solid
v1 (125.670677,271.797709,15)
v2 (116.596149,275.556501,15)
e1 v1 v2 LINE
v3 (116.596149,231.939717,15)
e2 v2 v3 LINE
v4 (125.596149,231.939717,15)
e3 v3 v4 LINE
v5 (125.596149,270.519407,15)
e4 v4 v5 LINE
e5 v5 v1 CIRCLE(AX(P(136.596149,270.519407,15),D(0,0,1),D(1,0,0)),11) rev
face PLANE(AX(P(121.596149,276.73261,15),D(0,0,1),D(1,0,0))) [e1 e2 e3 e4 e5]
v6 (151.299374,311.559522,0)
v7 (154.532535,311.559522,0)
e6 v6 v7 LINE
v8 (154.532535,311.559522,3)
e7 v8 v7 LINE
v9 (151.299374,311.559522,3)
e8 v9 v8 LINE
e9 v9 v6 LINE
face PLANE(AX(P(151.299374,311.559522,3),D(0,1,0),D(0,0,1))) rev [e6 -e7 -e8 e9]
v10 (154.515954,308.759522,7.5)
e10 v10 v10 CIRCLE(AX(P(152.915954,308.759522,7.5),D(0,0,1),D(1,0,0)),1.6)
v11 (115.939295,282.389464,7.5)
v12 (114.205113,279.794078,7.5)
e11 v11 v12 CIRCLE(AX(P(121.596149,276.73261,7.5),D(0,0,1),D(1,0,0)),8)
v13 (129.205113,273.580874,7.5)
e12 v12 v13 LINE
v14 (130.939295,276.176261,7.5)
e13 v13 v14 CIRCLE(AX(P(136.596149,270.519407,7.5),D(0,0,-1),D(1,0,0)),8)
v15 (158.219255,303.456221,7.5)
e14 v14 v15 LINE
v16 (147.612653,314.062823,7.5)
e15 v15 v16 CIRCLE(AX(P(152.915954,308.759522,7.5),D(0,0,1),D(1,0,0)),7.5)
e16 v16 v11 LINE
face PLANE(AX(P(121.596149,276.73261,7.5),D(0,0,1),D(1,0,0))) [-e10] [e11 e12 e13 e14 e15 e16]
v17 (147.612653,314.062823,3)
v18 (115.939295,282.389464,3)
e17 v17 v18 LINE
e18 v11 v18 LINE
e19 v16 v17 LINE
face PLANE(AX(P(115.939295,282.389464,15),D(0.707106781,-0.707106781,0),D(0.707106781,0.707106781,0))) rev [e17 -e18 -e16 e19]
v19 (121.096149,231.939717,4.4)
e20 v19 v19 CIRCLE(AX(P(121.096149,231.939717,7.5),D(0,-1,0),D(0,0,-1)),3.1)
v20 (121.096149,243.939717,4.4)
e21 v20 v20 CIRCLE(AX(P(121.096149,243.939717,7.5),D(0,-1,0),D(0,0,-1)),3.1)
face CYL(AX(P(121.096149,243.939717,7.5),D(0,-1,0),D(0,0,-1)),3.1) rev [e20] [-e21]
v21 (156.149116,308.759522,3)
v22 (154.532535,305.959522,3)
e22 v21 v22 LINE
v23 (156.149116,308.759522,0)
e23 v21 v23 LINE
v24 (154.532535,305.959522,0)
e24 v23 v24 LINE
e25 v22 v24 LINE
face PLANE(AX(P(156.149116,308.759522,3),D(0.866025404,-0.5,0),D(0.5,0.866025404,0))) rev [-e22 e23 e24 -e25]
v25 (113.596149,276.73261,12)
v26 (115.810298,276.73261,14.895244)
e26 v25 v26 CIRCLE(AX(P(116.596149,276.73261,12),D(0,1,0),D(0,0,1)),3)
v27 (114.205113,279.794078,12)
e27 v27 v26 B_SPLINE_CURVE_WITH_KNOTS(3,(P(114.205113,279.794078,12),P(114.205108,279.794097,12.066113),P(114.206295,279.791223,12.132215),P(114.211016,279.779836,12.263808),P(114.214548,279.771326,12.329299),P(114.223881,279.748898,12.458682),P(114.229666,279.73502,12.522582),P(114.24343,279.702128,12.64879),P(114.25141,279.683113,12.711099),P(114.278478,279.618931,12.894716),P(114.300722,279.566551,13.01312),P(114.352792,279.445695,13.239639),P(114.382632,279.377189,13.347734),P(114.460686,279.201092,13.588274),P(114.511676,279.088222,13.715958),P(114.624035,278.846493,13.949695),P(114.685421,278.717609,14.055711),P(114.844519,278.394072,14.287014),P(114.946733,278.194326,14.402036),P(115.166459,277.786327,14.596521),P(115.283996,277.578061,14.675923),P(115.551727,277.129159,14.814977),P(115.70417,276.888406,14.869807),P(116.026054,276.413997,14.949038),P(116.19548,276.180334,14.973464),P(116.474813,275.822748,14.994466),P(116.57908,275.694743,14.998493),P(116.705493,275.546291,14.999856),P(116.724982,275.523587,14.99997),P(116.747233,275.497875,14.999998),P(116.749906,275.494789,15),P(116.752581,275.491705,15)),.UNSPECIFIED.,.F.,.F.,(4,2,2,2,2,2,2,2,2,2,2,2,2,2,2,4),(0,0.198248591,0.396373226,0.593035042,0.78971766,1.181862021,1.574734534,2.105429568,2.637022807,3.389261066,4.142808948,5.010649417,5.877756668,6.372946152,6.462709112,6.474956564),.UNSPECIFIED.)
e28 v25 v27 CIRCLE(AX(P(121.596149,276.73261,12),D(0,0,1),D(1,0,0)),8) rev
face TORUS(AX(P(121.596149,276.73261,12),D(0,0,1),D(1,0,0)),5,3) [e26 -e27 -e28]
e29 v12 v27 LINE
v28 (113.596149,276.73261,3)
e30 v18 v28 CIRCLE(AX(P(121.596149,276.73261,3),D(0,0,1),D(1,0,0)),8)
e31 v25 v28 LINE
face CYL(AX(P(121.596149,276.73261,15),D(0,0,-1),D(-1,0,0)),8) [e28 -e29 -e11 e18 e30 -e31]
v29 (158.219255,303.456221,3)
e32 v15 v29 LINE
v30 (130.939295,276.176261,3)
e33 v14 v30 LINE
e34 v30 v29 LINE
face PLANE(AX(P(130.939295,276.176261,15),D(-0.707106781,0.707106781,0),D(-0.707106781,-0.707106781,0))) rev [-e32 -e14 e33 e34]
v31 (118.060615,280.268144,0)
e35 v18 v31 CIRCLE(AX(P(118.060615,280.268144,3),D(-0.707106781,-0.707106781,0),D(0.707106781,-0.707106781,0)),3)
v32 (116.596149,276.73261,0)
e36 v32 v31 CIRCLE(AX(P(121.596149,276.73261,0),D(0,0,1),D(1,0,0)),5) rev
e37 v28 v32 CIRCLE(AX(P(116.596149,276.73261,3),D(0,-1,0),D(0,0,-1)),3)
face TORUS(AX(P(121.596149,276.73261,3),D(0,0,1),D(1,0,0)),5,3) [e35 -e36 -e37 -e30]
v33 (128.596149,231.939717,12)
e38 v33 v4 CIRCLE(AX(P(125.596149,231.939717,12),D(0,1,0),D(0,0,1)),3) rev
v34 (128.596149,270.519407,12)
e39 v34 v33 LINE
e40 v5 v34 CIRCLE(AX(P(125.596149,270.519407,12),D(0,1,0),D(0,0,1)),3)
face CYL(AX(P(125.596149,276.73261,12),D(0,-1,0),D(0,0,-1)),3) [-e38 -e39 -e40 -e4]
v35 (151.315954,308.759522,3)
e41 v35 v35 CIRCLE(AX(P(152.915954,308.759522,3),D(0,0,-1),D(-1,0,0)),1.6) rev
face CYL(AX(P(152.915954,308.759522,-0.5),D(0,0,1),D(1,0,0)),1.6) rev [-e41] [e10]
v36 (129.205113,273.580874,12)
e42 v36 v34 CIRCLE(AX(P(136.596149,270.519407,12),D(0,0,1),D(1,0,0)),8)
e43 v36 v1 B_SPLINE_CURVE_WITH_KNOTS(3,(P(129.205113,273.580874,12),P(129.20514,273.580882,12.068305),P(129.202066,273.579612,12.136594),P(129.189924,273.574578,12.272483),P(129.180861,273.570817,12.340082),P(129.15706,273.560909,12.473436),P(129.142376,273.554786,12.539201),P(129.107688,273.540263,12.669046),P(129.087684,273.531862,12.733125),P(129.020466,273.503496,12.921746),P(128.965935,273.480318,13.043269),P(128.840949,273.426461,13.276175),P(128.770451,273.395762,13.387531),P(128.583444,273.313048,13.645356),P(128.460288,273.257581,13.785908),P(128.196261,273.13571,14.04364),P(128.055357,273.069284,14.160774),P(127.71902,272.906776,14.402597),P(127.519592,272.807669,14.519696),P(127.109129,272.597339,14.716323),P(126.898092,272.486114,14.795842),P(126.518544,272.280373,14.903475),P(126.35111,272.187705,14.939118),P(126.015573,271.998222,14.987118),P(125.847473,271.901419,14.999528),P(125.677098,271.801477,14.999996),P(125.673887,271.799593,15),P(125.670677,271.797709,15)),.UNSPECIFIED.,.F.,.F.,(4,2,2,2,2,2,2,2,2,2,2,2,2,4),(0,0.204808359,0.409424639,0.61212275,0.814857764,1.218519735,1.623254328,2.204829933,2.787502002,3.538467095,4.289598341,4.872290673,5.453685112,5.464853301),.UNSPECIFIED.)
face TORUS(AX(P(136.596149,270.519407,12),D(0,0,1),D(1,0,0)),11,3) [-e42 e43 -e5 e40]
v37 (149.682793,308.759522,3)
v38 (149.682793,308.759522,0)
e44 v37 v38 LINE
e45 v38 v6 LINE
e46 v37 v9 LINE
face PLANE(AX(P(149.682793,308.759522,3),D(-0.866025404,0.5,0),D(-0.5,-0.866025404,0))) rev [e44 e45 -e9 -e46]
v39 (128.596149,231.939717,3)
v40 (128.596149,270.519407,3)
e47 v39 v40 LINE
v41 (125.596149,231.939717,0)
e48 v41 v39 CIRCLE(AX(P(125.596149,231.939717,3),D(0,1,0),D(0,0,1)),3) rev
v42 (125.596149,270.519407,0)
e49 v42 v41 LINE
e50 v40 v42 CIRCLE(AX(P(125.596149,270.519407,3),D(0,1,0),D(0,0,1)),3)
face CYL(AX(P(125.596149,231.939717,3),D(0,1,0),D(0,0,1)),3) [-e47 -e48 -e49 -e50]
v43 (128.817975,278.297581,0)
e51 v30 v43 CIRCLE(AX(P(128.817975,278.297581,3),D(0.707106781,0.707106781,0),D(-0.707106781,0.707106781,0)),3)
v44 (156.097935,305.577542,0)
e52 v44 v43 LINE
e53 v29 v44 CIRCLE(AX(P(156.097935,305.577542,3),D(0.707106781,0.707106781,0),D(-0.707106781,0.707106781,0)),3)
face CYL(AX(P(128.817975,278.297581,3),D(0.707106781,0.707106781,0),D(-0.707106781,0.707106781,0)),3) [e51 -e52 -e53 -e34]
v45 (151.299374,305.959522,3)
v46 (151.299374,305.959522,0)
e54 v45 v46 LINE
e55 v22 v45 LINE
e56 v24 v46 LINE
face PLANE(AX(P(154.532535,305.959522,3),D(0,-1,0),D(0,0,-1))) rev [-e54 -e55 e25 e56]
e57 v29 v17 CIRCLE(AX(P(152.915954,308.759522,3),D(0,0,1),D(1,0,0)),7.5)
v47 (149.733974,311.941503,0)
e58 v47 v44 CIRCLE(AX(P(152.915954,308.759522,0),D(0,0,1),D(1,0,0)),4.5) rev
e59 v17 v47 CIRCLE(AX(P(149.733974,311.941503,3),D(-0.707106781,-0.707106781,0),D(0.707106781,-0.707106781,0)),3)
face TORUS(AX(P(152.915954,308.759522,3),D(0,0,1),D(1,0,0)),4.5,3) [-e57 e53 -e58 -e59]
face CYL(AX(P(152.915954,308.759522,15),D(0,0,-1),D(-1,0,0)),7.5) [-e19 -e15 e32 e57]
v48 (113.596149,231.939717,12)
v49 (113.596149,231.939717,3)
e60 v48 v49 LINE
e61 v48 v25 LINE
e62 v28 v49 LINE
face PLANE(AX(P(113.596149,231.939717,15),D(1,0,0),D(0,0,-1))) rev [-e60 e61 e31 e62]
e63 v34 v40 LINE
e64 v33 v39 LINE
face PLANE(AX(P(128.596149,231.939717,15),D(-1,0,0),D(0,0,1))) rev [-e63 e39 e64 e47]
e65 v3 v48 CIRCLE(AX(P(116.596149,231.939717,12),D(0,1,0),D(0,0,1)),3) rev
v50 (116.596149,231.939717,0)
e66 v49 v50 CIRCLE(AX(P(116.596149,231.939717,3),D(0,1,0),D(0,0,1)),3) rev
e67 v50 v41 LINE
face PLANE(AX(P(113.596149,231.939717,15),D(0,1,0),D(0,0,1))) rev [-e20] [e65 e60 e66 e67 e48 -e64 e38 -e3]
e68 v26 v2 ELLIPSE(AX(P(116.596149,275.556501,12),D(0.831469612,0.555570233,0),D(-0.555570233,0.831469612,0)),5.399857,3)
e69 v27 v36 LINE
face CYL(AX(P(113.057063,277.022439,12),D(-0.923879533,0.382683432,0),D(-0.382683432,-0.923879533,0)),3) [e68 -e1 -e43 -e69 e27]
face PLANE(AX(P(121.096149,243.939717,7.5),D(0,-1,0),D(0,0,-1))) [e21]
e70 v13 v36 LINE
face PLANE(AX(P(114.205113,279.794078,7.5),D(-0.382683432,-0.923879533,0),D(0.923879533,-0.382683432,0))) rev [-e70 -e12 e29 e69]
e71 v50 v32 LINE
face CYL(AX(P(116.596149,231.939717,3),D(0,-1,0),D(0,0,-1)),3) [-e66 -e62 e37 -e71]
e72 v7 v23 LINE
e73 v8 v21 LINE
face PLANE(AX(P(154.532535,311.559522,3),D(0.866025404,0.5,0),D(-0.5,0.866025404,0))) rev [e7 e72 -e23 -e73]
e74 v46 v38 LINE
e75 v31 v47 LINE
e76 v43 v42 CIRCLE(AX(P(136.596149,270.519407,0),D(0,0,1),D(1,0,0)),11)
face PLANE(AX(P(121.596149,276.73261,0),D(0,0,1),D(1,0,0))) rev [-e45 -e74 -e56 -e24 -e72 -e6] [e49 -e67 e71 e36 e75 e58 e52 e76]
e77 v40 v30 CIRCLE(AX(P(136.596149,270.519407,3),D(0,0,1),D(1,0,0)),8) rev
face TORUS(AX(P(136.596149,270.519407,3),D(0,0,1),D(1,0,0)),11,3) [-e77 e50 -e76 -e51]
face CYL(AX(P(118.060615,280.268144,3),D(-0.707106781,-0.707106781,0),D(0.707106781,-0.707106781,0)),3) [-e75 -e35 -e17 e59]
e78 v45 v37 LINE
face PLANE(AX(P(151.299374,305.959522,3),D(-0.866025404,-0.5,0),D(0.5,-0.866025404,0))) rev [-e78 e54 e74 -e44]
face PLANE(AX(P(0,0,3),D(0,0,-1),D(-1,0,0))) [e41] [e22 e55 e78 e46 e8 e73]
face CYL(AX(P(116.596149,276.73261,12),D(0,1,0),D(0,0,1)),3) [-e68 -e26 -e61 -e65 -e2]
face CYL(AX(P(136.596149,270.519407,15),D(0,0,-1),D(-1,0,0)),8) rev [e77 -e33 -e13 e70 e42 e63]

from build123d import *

# Parameters (mm, degrees)
EXTRUDE_1_DEPTH     = 15
SKETCH_2_R          = 3.1
CUT_EXTRUDE_1_DEPTH = 12
CUT_EXTRUDE_START   = -7.5
CUT_EXTRUDE_2_DEPTH = 7.5
SKETCH_4_R          = 1.6
CUT_EXTRUDE_3_DEPTH = 8
CUT_EXTRUDE_4_DEPTH = 3
FILLET_1_R          = 3


with BuildPart() as part:
    # Model → 凸台-拉伸1 (new body)
    with BuildSketch(Plane.XY):
        with BuildLine():
            Line((113.596149123, 231.939716908), (128.596149123, 231.939716908))
            Line((128.596149123, 231.939716908), (128.596149123, 270.519406691))
            ThreePointArc((128.596149123, 270.519406691), (129.205112863, 273.58087415), (130.939294874, 276.17626094))
            Line((130.939294874, 276.17626094), (158.219255135, 303.456221202))
            ThreePointArc((158.219255135, 303.456221202), (158.219255135, 314.06282292), (147.612653418, 314.06282292))
            Line((147.612653418, 314.06282292), (115.939294874, 282.389464376))
            ThreePointArc((115.939294874, 282.389464376), (114.205112863, 279.794077585), (113.596149123, 276.732610126))
            Line((113.596149123, 276.732610126), (113.596149123, 231.939716908))
        make_face()
    extrude(amount=EXTRUDE_1_DEPTH)

    # 草图2 → 切除-拉伸1 (cut)
    with BuildSketch(Plane.XZ.offset(-231.939716908)):
        with Locations(Location((121.096149123, 7.5, 0), (0, 0, 270))):
            Circle(SKETCH_2_R)
    extrude(amount=-CUT_EXTRUDE_1_DEPTH, mode=Mode.SUBTRACT)

    # 草图3 → 切除-拉伸2 (cut)
    with BuildSketch(Plane.XY.offset(15).offset(CUT_EXTRUDE_START)):
        with BuildLine():
            Line((114.205112863, 279.794077585), (129.205112863, 273.58087415))
            ThreePointArc((129.205112863, 273.58087415), (129.944392225, 274.963968555), (130.939294874, 276.17626094))
            Line((130.939294874, 276.17626094), (158.219255135, 303.456221202))
            ThreePointArc((158.219255135, 303.456221202), (158.219255135, 314.06282292), (147.612653418, 314.06282292))
            Line((147.612653418, 314.06282292), (115.939294874, 282.389464376))
            ThreePointArc((115.939294874, 282.389464376), (114.944392225, 281.17717199), (114.205112863, 279.794077585))
        make_face()
    extrude(amount=CUT_EXTRUDE_2_DEPTH, mode=Mode.SUBTRACT)

    # 草图4 → 切除-拉伸3 (cut)
    with BuildSketch(Plane.XY.offset(7.5)):
        with Locations((152.915954276, 308.759522061)):
            Circle(SKETCH_4_R)
    extrude(amount=-CUT_EXTRUDE_3_DEPTH, mode=Mode.SUBTRACT)

    # 草图5 → 切除-拉伸4 (cut)
    with BuildSketch(Plane(origin=(0, 0, 0), x_dir=(-1, 0, 0), z_dir=(0, 0, -1))):
        Polygon((-149.682792769, 308.759522061), (-151.299373523, 311.559522061), (-154.53253503, 311.559522061), (-156.149115784, 308.759522061), (-154.53253503, 305.959522061), (-151.299373523, 305.959522061), align=None)
    extrude(amount=-CUT_EXTRUDE_4_DEPTH, mode=Mode.SUBTRACT)

    # 圆角1
    # the kernel refuses this fillet: 3 mm, written as the material it takes off along each edge
    with BuildSketch(Plane(origin=(113.596149123, 276.732610126, 0), x_dir=(0, 0, 1), z_dir=(0, -1, 0))) as fillet_1_piece_1:
        with BuildLine():
            CenterArc((FILLET_1_R, -FILLET_1_R), FILLET_1_R, 90, 90)
            Line((0, -FILLET_1_R), (0, 0))
            Line((0, 0), (FILLET_1_R, 0))
        make_face()
    extrude(amount=52.292893219, mode=Mode.SUBTRACT)
    with BuildSketch(Plane(origin=(121.596149123, 276.732610126, 0), x_dir=(-0.7071067811865422, 0.7071067811865529, 0), z_dir=(0.7071067811865529, 0.7071067811865422, 0))) as fillet_1_piece_2:
        with BuildLine():
            CenterArc((8 - FILLET_1_R, FILLET_1_R), FILLET_1_R, 270, 90)
            Line((8, FILLET_1_R), (8, 0))
            Line((8, 0), (8 - FILLET_1_R, 0))
        make_face()
    revolve(axis=Axis((121.596149123, 276.732610126, 0), (0, 0, 1)), revolution_arc=45, mode=Mode.SUBTRACT)
    with BuildSketch(Plane(origin=(147.612653418, 314.06282292, 0), x_dir=(0.7071067811865483, -0.7071067811865468, 0), z_dir=(-0.7071067811865469, -0.7071067811865482, 0))) as fillet_1_piece_3:
        with BuildLine():
            CenterArc((FILLET_1_R, FILLET_1_R), FILLET_1_R, 180, 90)
            Line((0, FILLET_1_R), (0, 0))
            Line((0, 0), (FILLET_1_R, 0))
        make_face()
    extrude(amount=44.792893219, mode=Mode.SUBTRACT)
    with BuildSketch(Plane(origin=(152.915954276, 308.759522061, 0), x_dir=(0.7071067811865419, -0.7071067811865532, 0), z_dir=(-0.7071067811865532, -0.7071067811865419, 0))) as fillet_1_piece_4:
        with BuildLine():
            CenterArc((7.5 - FILLET_1_R, FILLET_1_R), FILLET_1_R, 270, 90)
            Line((7.5, FILLET_1_R), (7.5, 0))
            Line((7.5, 0), (7.5 - FILLET_1_R, 0))
        make_face()
    revolve(axis=Axis((152.915954276, 308.759522061, 0), (0, 0, 1)), revolution_arc=180, mode=Mode.SUBTRACT)
    with BuildSketch(Plane(origin=(130.939294874, 276.17626094, 0), x_dir=(-0.707106781186548, 0.7071067811865471, 0), z_dir=(0.7071067811865471, 0.7071067811865479, 0))) as fillet_1_piece_5:
        with BuildLine():
            CenterArc((FILLET_1_R, FILLET_1_R), FILLET_1_R, 180, 90)
            Line((0, FILLET_1_R), (0, 0))
            Line((0, 0), (FILLET_1_R, 0))
        make_face()
    extrude(amount=38.579689783, mode=Mode.SUBTRACT)
    with BuildSketch(Plane(origin=(136.596149123, 270.519406691, 0), x_dir=(-1, 0, 0), z_dir=(0, -1, 0))) as fillet_1_piece_6:
        with BuildLine():
            CenterArc((8 + FILLET_1_R, -FILLET_1_R), FILLET_1_R, 90, 90)
            Line((8, -FILLET_1_R), (8, 0))
            Line((8, 0), (8 + FILLET_1_R, 0))
        make_face()
    revolve(axis=Axis((136.596149123, 270.519406691, 0), (0, 0, -1)), revolution_arc=45, mode=Mode.SUBTRACT)
    with BuildSketch(Plane(origin=(136.596149123, 270.519406691, 15), x_dir=(-1, 0, 0), z_dir=(0, -1, 0))) as fillet_1_piece_7:
        with BuildLine():
            CenterArc((8 + FILLET_1_R, FILLET_1_R), FILLET_1_R, 180, 90)
            Line((8, FILLET_1_R), (8, 0))
            Line((8, 0), (8 + FILLET_1_R, 0))
        make_face()
    revolve(axis=Axis((136.596149123, 270.519406691, 15), (0, 0, -1)), revolution_arc=76.216141543, mode=Mode.SUBTRACT)
    with BuildSketch(Plane(origin=(128.596149123, 224.439716908, 0), x_dir=(-1, 0, 0), z_dir=(0, 1, 0))) as fillet_1_piece_8:
        with BuildLine():
            CenterArc((FILLET_1_R, FILLET_1_R), FILLET_1_R, 180, 90)
            Line((0, FILLET_1_R), (0, 0))
            Line((0, 0), (FILLET_1_R, 0))
        make_face()
    extrude(amount=46.079689783, mode=Mode.SUBTRACT)
    with BuildSketch(Plane(origin=(128.596149123, 224.439716908, 15), x_dir=(-1, 0, 0), z_dir=(0, 1, 0))) as fillet_1_piece_9:
        with BuildLine():
            CenterArc((FILLET_1_R, -FILLET_1_R), FILLET_1_R, 90, 90)
            Line((0, -FILLET_1_R), (0, 0))
            Line((0, 0), (FILLET_1_R, 0))
        make_face()
    extrude(amount=46.079689783, mode=Mode.SUBTRACT)
    with BuildSketch(Plane(origin=(107.276016369, 282.664203328, 15), x_dir=(-0.38268343236508984, -0.9238795325112866, 0), z_dir=(0.9238795325112867, -0.38268343236508984, 0))) as fillet_1_piece_10:
        with BuildLine():
            CenterArc((FILLET_1_R, FILLET_1_R), FILLET_1_R, 180, 90)
            Line((0, FILLET_1_R), (0, 0))
            Line((0, 0), (FILLET_1_R, 0))
        make_face()
    extrude(amount=31.235883004, mode=Mode.SUBTRACT)
    with BuildSketch(Plane(origin=(113.596149123, 276.732610126, 15), x_dir=(0, 0, -1), z_dir=(0, -1, 0))) as fillet_1_piece_11:
        with BuildLine():
            CenterArc((FILLET_1_R, FILLET_1_R), FILLET_1_R, 180, 90)
            Line((0, FILLET_1_R), (0, 0))
            Line((0, 0), (FILLET_1_R, 0))
        make_face()
    extrude(amount=52.292893219, mode=Mode.SUBTRACT)
    with BuildSketch(Plane(origin=(121.596149123, 276.732610126, 15), x_dir=(-0.23825985719225534, 0.9712014417466266, 0), z_dir=(0.9712014417466266, 0.23825985719225534, 0))) as fillet_1_piece_12:
        with BuildLine():
            CenterArc((8 - FILLET_1_R, -FILLET_1_R), FILLET_1_R, 0, 90)
            Line((8, -FILLET_1_R), (8, 0))
            Line((8, 0), (8 - FILLET_1_R, 0))
        make_face()
    revolve(axis=Axis((121.596149123, 276.732610126, 15), (0, 0, 1)), revolution_arc=76.216141543, mode=Mode.SUBTRACT)


solid = part.part
